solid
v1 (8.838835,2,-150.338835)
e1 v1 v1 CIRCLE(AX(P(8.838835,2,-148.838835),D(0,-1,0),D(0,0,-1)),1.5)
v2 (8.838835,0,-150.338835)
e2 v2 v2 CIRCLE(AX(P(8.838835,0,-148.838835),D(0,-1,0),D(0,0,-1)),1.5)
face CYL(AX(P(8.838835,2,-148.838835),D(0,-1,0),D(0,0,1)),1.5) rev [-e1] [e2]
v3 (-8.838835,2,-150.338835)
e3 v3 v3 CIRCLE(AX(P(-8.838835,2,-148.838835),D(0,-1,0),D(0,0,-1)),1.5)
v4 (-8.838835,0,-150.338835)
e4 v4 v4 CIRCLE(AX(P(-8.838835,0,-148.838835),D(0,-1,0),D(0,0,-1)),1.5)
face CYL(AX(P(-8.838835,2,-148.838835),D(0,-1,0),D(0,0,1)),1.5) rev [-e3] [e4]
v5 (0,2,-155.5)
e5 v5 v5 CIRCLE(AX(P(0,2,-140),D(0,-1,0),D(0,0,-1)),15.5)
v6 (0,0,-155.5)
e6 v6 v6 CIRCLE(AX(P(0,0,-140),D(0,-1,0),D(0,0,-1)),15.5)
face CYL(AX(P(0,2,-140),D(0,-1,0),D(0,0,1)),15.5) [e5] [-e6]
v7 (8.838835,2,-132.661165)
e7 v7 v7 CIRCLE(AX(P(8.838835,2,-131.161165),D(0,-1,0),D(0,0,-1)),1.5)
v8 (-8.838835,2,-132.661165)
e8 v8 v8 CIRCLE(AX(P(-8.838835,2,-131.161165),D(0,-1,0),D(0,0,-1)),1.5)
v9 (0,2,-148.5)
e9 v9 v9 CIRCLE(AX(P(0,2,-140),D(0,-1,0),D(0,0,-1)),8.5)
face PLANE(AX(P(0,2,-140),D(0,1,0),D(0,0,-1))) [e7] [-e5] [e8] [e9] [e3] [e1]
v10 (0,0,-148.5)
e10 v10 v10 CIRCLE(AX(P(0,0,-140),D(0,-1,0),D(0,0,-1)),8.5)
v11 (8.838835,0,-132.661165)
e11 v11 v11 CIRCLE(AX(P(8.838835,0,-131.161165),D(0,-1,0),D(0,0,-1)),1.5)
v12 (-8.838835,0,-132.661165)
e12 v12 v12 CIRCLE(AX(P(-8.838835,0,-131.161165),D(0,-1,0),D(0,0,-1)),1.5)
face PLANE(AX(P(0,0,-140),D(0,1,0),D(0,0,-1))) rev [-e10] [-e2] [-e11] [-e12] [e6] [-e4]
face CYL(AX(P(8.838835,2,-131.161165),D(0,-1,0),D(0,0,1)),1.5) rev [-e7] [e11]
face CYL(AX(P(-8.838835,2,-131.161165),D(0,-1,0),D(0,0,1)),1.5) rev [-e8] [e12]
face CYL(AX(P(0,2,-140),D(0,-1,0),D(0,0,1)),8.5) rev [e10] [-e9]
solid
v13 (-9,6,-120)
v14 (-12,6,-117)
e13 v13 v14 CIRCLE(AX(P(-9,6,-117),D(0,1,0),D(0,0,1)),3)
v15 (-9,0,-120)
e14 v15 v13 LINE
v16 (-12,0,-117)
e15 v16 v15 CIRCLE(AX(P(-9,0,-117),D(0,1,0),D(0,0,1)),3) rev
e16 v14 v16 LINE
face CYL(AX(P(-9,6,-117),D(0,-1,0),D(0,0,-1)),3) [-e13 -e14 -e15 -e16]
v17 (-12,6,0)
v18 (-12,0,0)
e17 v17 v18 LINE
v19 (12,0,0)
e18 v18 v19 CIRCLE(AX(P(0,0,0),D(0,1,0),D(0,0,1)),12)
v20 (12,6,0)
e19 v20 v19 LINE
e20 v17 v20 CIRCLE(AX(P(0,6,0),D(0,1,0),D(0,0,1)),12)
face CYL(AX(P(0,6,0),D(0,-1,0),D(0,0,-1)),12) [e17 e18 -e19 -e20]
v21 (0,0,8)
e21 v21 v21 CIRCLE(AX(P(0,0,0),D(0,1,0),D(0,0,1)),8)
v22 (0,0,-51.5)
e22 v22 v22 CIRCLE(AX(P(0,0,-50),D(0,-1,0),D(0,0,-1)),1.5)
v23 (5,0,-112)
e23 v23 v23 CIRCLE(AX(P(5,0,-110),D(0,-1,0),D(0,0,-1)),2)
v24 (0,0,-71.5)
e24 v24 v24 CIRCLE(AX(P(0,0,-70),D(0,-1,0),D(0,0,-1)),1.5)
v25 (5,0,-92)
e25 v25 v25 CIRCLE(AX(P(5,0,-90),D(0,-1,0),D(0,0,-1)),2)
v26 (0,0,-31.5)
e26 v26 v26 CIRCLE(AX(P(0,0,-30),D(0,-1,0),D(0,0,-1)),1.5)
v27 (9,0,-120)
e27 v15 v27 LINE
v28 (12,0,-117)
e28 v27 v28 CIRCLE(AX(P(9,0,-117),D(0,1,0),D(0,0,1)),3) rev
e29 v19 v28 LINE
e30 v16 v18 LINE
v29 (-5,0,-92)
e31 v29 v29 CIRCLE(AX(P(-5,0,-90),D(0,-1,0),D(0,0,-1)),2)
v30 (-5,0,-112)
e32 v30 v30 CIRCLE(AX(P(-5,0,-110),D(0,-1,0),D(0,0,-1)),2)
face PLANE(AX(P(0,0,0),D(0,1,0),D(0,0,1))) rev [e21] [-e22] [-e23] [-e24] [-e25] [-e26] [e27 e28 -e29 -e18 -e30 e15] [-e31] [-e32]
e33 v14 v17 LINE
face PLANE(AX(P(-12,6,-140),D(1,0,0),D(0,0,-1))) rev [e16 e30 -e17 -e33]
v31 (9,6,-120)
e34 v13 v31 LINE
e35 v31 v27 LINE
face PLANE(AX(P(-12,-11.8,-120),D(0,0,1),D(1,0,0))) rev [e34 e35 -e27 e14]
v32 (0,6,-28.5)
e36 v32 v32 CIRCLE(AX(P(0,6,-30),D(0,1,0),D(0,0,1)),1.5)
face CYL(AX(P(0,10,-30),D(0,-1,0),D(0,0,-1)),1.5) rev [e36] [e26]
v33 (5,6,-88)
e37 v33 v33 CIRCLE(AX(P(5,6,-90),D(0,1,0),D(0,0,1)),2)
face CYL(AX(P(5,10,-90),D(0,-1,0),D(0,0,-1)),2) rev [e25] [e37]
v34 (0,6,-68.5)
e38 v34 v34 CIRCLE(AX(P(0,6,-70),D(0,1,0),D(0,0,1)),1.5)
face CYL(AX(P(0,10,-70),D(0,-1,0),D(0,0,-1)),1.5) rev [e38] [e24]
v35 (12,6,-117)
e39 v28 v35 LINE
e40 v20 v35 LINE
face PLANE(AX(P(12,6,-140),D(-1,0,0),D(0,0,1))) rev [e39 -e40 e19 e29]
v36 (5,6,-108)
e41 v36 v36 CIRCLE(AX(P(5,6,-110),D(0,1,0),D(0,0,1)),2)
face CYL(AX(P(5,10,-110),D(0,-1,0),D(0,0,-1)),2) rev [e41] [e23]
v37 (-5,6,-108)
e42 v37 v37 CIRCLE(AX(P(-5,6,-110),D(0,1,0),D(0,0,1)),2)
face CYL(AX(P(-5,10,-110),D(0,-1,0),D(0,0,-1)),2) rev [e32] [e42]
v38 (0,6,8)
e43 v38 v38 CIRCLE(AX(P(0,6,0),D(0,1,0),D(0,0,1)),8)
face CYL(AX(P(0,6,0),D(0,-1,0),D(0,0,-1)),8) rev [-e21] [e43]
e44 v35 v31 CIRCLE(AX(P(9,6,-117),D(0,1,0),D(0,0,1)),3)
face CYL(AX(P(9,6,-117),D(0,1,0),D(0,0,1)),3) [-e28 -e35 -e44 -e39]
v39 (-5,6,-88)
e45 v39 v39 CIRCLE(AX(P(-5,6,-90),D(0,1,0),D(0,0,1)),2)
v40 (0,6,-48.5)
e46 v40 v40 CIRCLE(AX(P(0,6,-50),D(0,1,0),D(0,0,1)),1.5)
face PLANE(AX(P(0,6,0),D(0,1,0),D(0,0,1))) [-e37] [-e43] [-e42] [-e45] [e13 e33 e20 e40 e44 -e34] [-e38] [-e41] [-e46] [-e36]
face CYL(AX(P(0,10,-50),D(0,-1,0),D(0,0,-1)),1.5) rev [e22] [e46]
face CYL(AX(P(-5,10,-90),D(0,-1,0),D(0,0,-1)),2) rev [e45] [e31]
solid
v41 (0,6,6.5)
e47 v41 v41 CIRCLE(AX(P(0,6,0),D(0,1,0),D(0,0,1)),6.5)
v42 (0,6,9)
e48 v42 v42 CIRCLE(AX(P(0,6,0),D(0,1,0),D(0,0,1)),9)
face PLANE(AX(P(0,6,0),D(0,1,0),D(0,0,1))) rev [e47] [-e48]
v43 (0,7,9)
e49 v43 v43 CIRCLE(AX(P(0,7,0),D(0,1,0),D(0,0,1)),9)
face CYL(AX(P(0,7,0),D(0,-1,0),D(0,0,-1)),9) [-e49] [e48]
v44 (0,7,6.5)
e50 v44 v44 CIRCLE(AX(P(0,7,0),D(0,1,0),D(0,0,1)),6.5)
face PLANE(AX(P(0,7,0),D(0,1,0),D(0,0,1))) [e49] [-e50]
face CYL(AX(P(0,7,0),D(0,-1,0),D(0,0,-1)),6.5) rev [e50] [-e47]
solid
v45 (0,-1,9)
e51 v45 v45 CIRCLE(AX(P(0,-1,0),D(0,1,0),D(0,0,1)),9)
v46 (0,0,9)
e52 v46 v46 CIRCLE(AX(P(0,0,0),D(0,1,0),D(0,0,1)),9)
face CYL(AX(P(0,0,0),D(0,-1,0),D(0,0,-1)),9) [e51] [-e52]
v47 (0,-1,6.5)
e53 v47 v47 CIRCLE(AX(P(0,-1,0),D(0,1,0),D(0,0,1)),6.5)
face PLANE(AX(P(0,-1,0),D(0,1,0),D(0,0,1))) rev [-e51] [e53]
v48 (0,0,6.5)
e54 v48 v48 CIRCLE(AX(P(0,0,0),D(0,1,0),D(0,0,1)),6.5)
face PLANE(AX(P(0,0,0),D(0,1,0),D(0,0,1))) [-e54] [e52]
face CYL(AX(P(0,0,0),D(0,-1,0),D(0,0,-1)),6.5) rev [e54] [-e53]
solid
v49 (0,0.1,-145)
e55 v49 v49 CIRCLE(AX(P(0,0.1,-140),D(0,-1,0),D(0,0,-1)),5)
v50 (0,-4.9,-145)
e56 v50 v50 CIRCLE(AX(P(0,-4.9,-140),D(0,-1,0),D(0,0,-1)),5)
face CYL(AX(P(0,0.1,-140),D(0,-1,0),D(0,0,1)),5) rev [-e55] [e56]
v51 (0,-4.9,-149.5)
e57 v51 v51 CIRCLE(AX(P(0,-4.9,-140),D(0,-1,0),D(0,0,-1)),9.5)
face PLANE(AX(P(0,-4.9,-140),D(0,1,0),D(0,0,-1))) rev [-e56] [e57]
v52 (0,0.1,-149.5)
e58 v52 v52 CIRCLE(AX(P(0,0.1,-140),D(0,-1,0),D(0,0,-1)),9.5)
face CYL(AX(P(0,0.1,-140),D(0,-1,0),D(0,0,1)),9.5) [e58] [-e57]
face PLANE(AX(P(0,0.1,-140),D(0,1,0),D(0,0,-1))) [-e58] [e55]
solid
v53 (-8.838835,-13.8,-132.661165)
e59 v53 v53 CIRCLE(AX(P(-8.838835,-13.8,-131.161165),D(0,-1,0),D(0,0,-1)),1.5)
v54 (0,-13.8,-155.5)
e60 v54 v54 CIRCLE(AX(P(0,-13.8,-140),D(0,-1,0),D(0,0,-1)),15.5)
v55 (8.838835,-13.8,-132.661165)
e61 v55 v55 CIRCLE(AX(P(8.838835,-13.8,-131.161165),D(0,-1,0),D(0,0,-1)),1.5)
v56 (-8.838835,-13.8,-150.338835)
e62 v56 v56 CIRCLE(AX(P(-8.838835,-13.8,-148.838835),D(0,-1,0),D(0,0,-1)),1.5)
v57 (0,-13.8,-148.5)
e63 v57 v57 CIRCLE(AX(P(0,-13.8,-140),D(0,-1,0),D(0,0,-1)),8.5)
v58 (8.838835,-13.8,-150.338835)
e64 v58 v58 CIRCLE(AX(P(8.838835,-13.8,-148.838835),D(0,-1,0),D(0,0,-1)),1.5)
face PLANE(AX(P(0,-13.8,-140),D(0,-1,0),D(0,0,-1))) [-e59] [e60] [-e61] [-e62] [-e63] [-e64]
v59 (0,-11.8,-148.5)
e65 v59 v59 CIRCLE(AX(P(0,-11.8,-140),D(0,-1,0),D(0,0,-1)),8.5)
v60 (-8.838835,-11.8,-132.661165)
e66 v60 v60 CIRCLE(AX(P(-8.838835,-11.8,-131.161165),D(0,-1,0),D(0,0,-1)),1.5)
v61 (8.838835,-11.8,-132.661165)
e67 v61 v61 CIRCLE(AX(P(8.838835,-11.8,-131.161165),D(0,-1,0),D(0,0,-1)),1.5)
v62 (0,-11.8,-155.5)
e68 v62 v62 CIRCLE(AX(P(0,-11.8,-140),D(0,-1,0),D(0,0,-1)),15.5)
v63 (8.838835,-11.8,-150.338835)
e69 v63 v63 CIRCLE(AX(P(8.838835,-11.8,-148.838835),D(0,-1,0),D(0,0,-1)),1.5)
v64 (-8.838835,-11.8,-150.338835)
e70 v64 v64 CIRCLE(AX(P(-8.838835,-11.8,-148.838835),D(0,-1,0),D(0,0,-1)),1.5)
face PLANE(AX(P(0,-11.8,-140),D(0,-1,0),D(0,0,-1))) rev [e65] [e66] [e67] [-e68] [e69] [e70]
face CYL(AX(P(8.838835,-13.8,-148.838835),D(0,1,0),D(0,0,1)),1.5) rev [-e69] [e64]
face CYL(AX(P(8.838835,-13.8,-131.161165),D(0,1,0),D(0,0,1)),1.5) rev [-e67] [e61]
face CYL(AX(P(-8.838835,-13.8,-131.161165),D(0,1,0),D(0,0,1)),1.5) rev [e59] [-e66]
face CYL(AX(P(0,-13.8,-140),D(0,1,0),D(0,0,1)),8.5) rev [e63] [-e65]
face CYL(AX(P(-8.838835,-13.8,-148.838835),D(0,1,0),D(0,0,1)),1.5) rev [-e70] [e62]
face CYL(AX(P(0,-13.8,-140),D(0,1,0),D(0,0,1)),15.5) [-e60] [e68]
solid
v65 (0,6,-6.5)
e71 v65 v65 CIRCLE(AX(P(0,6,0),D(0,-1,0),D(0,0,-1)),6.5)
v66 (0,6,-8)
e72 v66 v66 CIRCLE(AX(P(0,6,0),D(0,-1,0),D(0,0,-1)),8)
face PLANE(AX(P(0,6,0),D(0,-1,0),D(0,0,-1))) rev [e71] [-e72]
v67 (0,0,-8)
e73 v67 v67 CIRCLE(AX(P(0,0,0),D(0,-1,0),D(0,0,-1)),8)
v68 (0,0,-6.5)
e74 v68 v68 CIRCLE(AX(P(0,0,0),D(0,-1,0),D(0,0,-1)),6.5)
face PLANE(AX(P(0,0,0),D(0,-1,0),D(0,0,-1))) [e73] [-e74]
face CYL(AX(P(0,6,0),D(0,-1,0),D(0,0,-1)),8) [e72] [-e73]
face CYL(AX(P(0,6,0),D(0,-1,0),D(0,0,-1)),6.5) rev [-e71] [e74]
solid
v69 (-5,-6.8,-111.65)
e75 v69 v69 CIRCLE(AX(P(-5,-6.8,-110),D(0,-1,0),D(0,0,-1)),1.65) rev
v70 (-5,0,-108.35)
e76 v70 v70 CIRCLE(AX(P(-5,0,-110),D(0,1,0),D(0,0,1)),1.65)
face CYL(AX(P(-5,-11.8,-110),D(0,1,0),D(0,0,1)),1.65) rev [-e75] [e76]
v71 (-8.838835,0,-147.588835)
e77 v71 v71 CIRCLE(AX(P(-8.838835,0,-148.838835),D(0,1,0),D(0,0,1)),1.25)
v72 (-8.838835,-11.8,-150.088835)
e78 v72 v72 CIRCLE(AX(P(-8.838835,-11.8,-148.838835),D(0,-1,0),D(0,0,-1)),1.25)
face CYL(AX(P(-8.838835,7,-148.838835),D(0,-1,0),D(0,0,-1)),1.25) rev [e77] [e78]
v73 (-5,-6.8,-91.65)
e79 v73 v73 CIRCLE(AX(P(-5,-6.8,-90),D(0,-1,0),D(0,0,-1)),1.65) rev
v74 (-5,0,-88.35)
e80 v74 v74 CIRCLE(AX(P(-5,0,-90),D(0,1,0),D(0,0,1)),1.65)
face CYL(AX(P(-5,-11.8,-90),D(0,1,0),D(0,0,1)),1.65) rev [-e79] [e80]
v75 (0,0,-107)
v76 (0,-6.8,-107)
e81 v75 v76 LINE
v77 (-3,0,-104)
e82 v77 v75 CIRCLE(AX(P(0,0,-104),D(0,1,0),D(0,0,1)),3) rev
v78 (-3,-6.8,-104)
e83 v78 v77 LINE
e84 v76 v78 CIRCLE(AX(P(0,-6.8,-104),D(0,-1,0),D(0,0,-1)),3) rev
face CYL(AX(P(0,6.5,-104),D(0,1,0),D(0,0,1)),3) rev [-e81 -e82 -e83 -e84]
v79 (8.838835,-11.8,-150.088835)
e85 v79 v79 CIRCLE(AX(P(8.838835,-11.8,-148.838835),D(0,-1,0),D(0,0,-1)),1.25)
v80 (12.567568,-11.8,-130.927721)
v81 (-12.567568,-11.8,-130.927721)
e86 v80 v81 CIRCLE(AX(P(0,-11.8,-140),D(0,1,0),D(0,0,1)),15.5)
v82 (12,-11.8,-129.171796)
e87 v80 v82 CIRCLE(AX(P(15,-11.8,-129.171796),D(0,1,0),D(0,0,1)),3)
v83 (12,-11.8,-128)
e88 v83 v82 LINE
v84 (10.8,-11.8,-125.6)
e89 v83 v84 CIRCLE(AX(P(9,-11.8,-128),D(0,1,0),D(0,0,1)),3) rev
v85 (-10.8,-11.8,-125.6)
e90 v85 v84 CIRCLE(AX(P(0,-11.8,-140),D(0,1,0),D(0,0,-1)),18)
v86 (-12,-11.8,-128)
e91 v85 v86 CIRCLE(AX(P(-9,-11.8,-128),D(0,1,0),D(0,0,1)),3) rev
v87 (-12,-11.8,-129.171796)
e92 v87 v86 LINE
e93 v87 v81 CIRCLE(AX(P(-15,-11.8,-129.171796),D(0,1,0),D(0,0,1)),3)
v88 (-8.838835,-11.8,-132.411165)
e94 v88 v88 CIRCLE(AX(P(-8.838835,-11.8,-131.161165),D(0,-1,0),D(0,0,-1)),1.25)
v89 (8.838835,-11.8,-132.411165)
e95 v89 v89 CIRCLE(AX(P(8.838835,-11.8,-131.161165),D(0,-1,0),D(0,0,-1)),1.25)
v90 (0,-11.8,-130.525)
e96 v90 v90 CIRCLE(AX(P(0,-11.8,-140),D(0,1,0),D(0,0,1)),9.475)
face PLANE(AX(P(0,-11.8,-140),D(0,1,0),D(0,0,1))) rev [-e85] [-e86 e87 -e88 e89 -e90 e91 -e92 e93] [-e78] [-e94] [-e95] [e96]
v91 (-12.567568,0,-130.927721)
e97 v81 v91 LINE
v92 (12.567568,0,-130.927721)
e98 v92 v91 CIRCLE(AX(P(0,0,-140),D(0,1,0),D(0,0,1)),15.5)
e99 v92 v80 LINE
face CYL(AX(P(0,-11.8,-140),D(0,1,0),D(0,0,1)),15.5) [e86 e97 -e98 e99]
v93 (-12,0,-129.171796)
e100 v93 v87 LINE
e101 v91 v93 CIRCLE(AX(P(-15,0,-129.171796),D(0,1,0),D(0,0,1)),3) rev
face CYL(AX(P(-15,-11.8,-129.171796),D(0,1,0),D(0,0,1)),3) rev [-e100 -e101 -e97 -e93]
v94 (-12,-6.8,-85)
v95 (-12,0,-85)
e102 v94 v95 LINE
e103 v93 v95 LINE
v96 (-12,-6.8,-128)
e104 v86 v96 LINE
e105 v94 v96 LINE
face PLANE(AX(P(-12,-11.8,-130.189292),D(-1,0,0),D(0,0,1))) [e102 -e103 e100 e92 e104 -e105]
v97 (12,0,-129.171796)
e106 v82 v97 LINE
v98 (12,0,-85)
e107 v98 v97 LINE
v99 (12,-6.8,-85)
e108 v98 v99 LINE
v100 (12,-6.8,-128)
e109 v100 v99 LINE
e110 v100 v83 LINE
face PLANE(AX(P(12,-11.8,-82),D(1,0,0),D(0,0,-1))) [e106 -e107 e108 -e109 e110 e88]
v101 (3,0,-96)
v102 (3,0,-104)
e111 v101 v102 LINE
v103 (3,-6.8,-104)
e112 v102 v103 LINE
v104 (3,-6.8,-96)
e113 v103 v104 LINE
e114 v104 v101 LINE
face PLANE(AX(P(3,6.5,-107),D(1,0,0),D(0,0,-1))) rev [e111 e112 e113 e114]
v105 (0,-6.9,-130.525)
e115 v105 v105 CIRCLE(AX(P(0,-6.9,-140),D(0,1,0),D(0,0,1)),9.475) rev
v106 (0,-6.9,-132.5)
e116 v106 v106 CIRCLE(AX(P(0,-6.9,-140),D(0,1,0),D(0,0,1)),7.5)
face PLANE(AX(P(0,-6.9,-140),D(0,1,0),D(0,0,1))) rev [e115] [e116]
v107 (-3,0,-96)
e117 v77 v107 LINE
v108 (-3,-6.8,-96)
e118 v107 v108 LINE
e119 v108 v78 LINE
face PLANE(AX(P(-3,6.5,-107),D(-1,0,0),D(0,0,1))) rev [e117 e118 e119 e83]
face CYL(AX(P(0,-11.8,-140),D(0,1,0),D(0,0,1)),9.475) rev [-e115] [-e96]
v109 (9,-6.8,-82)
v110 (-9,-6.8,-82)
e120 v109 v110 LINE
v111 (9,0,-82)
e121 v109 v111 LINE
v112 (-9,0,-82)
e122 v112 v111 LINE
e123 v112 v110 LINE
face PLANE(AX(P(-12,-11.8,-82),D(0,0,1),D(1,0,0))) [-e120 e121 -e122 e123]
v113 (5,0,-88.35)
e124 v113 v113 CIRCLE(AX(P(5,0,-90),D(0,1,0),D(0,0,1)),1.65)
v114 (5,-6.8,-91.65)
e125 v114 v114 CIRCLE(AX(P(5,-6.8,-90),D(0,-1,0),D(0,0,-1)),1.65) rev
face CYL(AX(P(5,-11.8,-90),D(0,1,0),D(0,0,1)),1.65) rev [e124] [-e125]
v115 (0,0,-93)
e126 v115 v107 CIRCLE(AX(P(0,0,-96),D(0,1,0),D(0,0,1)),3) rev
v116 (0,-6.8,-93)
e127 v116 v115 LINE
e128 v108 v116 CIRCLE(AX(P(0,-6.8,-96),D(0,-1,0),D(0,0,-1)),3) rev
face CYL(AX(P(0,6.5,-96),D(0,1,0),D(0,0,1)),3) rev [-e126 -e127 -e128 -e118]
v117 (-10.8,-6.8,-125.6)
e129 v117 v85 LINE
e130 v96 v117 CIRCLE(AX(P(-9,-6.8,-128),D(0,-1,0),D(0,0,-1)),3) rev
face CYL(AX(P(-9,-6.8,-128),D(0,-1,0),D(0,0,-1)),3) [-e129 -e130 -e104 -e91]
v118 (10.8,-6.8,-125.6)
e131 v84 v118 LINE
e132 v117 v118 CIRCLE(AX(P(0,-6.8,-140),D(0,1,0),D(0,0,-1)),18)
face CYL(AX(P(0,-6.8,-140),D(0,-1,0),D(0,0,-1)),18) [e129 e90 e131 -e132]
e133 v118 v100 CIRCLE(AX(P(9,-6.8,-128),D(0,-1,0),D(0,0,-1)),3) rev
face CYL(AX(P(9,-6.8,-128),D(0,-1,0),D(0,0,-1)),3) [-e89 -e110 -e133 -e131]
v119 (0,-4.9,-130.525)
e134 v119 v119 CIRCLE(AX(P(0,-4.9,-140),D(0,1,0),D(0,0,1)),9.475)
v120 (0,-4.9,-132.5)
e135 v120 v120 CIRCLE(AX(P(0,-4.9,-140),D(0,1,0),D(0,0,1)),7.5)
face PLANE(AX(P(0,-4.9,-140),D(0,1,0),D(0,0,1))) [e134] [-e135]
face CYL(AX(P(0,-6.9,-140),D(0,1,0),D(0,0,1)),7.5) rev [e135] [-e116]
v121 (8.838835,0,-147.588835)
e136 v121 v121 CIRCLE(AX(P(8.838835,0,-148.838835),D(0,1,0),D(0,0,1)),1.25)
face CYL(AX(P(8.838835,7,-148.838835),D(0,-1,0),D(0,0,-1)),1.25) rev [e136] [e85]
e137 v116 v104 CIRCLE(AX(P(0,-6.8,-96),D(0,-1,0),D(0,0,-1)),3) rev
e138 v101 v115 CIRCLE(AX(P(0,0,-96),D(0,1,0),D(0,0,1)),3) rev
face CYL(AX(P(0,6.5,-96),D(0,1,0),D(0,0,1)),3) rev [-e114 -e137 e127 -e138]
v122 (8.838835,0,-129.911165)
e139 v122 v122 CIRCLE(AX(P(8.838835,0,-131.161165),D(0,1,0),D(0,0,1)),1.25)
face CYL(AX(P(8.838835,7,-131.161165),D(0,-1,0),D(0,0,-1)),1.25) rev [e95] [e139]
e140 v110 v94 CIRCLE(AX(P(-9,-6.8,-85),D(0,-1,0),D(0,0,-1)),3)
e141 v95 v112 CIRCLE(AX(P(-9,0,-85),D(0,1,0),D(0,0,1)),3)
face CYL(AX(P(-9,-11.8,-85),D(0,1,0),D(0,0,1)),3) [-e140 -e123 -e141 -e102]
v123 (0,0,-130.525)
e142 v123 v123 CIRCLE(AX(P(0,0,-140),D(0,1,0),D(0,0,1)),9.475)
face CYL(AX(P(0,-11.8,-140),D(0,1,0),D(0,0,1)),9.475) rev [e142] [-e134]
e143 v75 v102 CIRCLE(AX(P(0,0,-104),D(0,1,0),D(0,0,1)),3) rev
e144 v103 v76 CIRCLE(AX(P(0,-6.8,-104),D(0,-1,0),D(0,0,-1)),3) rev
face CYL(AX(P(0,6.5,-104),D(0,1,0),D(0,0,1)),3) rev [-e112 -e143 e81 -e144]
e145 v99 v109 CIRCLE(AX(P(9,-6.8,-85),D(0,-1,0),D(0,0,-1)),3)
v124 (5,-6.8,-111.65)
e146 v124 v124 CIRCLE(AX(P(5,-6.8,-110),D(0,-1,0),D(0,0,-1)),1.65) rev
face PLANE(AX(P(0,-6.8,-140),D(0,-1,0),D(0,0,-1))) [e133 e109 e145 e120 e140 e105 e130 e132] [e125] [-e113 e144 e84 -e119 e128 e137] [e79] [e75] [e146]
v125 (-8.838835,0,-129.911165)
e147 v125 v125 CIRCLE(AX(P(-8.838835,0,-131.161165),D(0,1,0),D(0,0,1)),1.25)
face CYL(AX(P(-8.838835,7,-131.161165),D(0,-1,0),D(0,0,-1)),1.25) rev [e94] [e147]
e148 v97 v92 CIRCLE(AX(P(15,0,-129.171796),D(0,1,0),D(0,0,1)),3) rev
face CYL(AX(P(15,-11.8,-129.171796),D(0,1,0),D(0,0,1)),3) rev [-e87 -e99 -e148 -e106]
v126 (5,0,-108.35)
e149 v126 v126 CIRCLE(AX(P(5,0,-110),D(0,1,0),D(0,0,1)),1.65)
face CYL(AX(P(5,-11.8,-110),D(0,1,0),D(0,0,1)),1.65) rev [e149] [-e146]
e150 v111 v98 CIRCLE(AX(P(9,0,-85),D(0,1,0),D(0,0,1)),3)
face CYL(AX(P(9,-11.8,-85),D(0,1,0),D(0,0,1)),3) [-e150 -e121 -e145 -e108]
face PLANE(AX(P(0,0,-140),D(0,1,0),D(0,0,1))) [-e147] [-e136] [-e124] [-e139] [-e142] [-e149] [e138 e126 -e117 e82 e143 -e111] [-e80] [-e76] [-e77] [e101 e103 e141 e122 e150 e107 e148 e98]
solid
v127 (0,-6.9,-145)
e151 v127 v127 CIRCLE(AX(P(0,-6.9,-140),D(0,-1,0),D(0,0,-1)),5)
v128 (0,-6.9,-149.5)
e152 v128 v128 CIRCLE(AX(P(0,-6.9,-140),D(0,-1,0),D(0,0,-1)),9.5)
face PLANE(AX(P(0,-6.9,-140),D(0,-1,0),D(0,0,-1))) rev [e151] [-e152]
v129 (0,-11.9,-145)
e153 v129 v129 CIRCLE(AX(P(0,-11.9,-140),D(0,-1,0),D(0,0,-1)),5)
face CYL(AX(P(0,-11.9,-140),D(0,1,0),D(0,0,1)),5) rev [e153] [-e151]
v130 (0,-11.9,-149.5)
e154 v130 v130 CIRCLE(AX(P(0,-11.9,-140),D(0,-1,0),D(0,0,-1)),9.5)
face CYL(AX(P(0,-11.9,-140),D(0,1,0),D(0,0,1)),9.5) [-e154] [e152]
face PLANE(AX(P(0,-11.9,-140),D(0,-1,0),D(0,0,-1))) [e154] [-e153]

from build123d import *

# Parameters (mm, degrees)
SKETCH_1_R             = 8
EXTRUDE_1_DEPTH        = 6
SKETCH_2_R             = 8
SKETCH_2_R_2           = 5
EXTRUDE_2_DEPTH        = 6
EXTRUDE_2_2_DEPTH      = 6
SKETCH_3_R             = 8
SKETCH_3_R_2           = 5
EXTRUDE_3_DEPTH        = 0.5
EXTRUDE_3_2_DEPTH      = 0.5
PATTERN_LINEAR_1_COUNT = 2
PATTERN_LINEAR_1_PITCH = 6.5
SKETCH_4_R             = 2
SKETCH_4_R_2           = 1.5
CUT_EXTRUDE_1_DEPTH    = 10
SKETCH_5_R             = 9.475
SKETCH_5_R_2           = 1.65
EXTRUDE_4_DEPTH        = 11.8
CUT_EXTRUDE_4_DEPTH    = 158.281085958
CUT_EXTRUDE_2_DEPTH    = 5
SKETCH_8_W             = 6
SKETCH_8_H             = 14
CUT_EXTRUDE_3_DEPTH    = 158.338456837
FILLET_2_R             = 3
SKETCH_11_R            = 8
SKETCH_11_R_2          = 6.5
EXTRUDE_5_DEPTH        = 6
SKETCH_14_R            = 9
SKETCH_14_R_2          = 6.5
EXTRUDE_7_DEPTH        = 1
PATTERN_LINEAR_2_COUNT = 2
PATTERN_LINEAR_2_PITCH = 7
FILLET_1_R             = 3
EXTRUDE_START          = -4.9
SKETCH_16_R            = 9.475
SKETCH_16_R_2          = 7.5
EXTRUDE_8_DEPTH        = 2
SKETCH_17_R            = 9.5
SKETCH_17_R_2          = 5
EXTRUDE_9_DEPTH        = 5
SKETCH_18_R            = 15.5
SKETCH_18_R_2          = 1.5
SKETCH_18_R_3          = 8.5
EXTRUDE_10_DEPTH       = 2
SKETCH_20_R            = 1.25
CUT_EXTRUDE_5_DEPTH    = 158.39739515


with BuildPart() as part:
    # 草图1 → 凸台-拉伸1 (new body)
    with BuildSketch(Plane(origin=(0, 0, 0), x_dir=(1, 0, 0), z_dir=(0, 1, 0))):
        with BuildLine():
            Line((-12, 140), (-12, 0))
            ThreePointArc((-12, 0), (0, -12), (12, 0))
            Line((12, 0), (12, 140))
            ThreePointArc((12, 140), (0, 152), (-12, 140))
        make_face()
        with Locations(Location((0, 0, 0), (0, 0, 270))):
            Circle(SKETCH_1_R, mode=Mode.SUBTRACT)
        with Locations(Location((0, 140, 0), (0, 0, 270))):
            Circle(SKETCH_1_R, mode=Mode.SUBTRACT)
    extrude(amount=EXTRUDE_1_DEPTH)

    # 草图4 → 切除-拉伸1 (cut)
    with BuildSketch(Plane.XZ):
        with Locations(Location((5, -90, 0), (0, 0, 270))):
            Circle(SKETCH_4_R)
        with Locations(Location((-5, -90, 0), (0, 0, 270))):
            Circle(SKETCH_4_R)
        with Locations(Location((-5, -110, 0), (0, 0, 270))):
            Circle(SKETCH_4_R)
        with Locations(Location((5, -110, 0), (0, 0, 270))):
            Circle(SKETCH_4_R)
        with Locations(Location((0, -70, 0), (0, 0, 270))):
            Circle(SKETCH_4_R_2)
        with Locations(Location((0, -50, 0), (0, 0, 270))):
            Circle(SKETCH_4_R_2)
        with Locations(Location((0, -30, 0), (0, 0, 270))):
            Circle(SKETCH_4_R_2)
    extrude(amount=-CUT_EXTRUDE_1_DEPTH, mode=Mode.SUBTRACT)

    # 草图9 → 切除-拉伸4 (cut, through all)
    with BuildSketch(Plane(origin=(0, 6, 0), x_dir=(1, 0, 0), z_dir=(0, 1, 0))):
        with BuildLine():
            Line((-12, 120), (12, 120))
            Line((12, 120), (12, 140))
            ThreePointArc((12, 140), (0, 152), (-12, 140))
            Line((-12, 140), (-12, 120))
        make_face()
    extrude(amount=-CUT_EXTRUDE_4_DEPTH, mode=Mode.SUBTRACT)

    # 圆角2
    fillet_2_edges = [part.edges().sort_by_distance(p)[0] for p in [
        (-12, 3, -120),
        (12, 3, -120),
    ]]
    fillet(fillet_2_edges, radius=FILLET_2_R)


with BuildPart() as body_2:
    # 草图2 → 凸台-拉伸2 (new body)
    with BuildSketch(Plane(origin=(0, 6, 0), x_dir=(1, 0, 0), z_dir=(0, 1, 0))):
        with Locations(Location((0, 0, 0), (0, 0, 270))):
            Circle(SKETCH_2_R)
        with Locations(Location((0, 0, 0), (0, 0, 270))):
            Circle(SKETCH_2_R_2, mode=Mode.SUBTRACT)
    extrude(amount=-EXTRUDE_2_DEPTH)


with BuildPart() as body_3:
    # 草图2 → Extrude 2 2 (new body)
    with BuildSketch(Plane(origin=(0, 6, 0), x_dir=(1, 0, 0), z_dir=(0, 1, 0))):
        with Locations(Location((0, 140, 0), (0, 0, 270))):
            Circle(SKETCH_2_R)
        with Locations(Location((0, 140, 0), (0, 0, 270))):
            Circle(SKETCH_2_R_2, mode=Mode.SUBTRACT)
    extrude(amount=-EXTRUDE_2_2_DEPTH)


with BuildPart() as body_4:
    # 草图3 → 凸台-拉伸3 (new body)
    with BuildSketch(Plane.XZ):
        with Locations(Location((0, 0, 0), (0, 0, 90))):
            Circle(SKETCH_3_R)
        with Locations(Location((0, 0, 0), (0, 0, 270))):
            Circle(SKETCH_3_R_2, mode=Mode.SUBTRACT)
    extrude(amount=EXTRUDE_3_DEPTH)


with BuildPart() as body_5:
    # 草图3 → Extrude 3 2 (new body)
    with BuildSketch(Plane.XZ):
        with Locations(Location((0, -140, 0), (0, 0, 90))):
            Circle(SKETCH_3_R)
        with Locations(Location((0, -140, 0), (0, 0, 90))):
            Circle(SKETCH_3_R_2, mode=Mode.SUBTRACT)
    extrude(amount=EXTRUDE_3_2_DEPTH)


with BuildPart() as pattern_linear_1_1:
    # 阵列(线性)1: pattern copy
    add(body_4.part.moved(Location(Vector(0, 1, 0) * (1 * PATTERN_LINEAR_1_PITCH))))


with BuildPart() as pattern_linear_1_2:
    # 阵列(线性)1: pattern copy
    add(body_5.part.moved(Location(Vector(0, 1, 0) * (1 * PATTERN_LINEAR_1_PITCH))))


with BuildPart() as body_8:
    # 草图5 → 凸台-拉伸4 (new body)
    with BuildSketch(Plane(origin=(0, 0, 0), x_dir=(1, 0, 0), z_dir=(0, 1, 0))):
        with BuildLine():
            Line((-12, 82), (12, 82))
            Line((12, 82), (12, 130.189291565))
            ThreePointArc((12, 130.189291565), (0, 155.5), (-12, 130.189291565))
            Line((-12, 130.189291565), (-12, 82))
        make_face()
        with Locations(Location((0, 140, 0), (0, 0, 270))):
            Circle(SKETCH_5_R, mode=Mode.SUBTRACT)
        with Locations(Location((-5, 110, 0), (0, 0, 270))):
            Circle(SKETCH_5_R_2, mode=Mode.SUBTRACT)
        with Locations(Location((-5, 90, 0), (0, 0, 270))):
            Circle(SKETCH_5_R_2, mode=Mode.SUBTRACT)
        with Locations(Location((5, 90, 0), (0, 0, 270))):
            Circle(SKETCH_5_R_2, mode=Mode.SUBTRACT)
        with Locations(Location((5, 110, 0), (0, 0, 270))):
            Circle(SKETCH_5_R_2, mode=Mode.SUBTRACT)
    extrude(amount=-EXTRUDE_4_DEPTH)

    # 草图6 → 切除-拉伸2 (cut)
    with BuildSketch(Plane.XZ.offset(11.8)):
        with BuildLine():
            Line((-12, -82), (-12, -126.583592135))
            ThreePointArc((-12, -126.583592135), (0, -122), (12, -126.583592135))
            Line((12, -126.583592135), (12, -82))
            Line((12, -82), (-12, -82))
        make_face()
    extrude(amount=-CUT_EXTRUDE_2_DEPTH, mode=Mode.SUBTRACT)

    # 草图8 → 切除-拉伸3 (cut, through all)
    with BuildSketch(Plane.XZ.offset(11.8)):
        with Locations((0, -100)):
            Rectangle(SKETCH_8_W, SKETCH_8_H)
    extrude(amount=-CUT_EXTRUDE_3_DEPTH, mode=Mode.SUBTRACT)

    # 圆角1
    fillet_1_edges = [body_8.edges().sort_by_distance(p)[0] for p in [
        (12, -9.3, -126.583592135),
        (-12, -9.3, -126.583592135),
        (-12, -3.4, -82),
        (12, -3.4, -82),
        (3, -3.4, -93),
        (3, -3.4, -107),
        (-3, -3.4, -107),
        (-3, -3.4, -93),
        (12, -5.9, -130.189291565),
        (-12, -5.9, -130.189291565),
    ]]
    fillet(fillet_1_edges, radius=FILLET_1_R - 0.0001)  # a hair under: the kernel refuses the full size

    # 草图16 → 凸台-拉伸8 (add)
    with BuildSketch(Plane(origin=(0, 0, 0), x_dir=(1, 0, 0), z_dir=(0, 1, 0)).offset(EXTRUDE_START)):
        with Locations(Location((0, 140, 0), (0, 0, 270))):
            Circle(SKETCH_16_R)
        with Locations(Location((0, 140, 0), (0, 0, 270))):
            Circle(SKETCH_16_R_2, mode=Mode.SUBTRACT)
    extrude(amount=-EXTRUDE_8_DEPTH)

    # 草图20 → 切除-拉伸5 (cut, through all)
    with BuildSketch(Plane.XZ.offset(11.8)):
        with Locations(Location((-8.838834765, -131.161165235, 0), (0, 0, 270))):
            Circle(SKETCH_20_R)
        with Locations(Location((8.838834765, -131.161165235, 0), (0, 0, 270))):
            Circle(SKETCH_20_R)
        with Locations(Location((-8.838834765, -148.838834765, 0), (0, 0, 270))):
            Circle(SKETCH_20_R)
        with Locations(Location((8.838834765, -148.838834765, 0), (0, 0, 270))):
            Circle(SKETCH_20_R)
    extrude(amount=-CUT_EXTRUDE_5_DEPTH, mode=Mode.SUBTRACT)


with BuildPart() as body_5_1:
    # Move Body 2: read off the stored shape, not the designer's step
    # Move Body 2: moved
    add(body_5.part.moved(Location((0, -11.8, 0))))


with BuildPart() as pattern_linear_1_2_1:
    # Move Body 3: read off the stored shape, not the designer's step
    # Move Body 3: moved
    add(pattern_linear_1_2.part.moved(Location((0, -6, 0))))


with BuildPart() as body_3_2:
    # 草图11 → 凸台-拉伸5 (new body)
    with BuildSketch(Plane.XZ):
        with Locations(Location((0, 0, 0), (0, 0, 270))):
            Circle(SKETCH_11_R)
        with Locations(Location((0, 0, 0), (0, 0, 270))):
            Circle(SKETCH_11_R_2, mode=Mode.SUBTRACT)
    extrude(amount=-EXTRUDE_5_DEPTH)


with BuildPart() as body_4_2:
    # 草图14 → 凸台-拉伸7 (new body)
    with BuildSketch(Plane(origin=(0, 6, 0), x_dir=(1, 0, 0), z_dir=(0, 1, 0))):
        with Locations(Location((0, 0, 0), (0, 0, 270))):
            Circle(SKETCH_14_R)
        with Locations(Location((0, 0, 0), (0, 0, 270))):
            Circle(SKETCH_14_R_2, mode=Mode.SUBTRACT)
    extrude(amount=EXTRUDE_7_DEPTH)


with BuildPart() as pattern_linear_2_1:
    # 阵列(线性)2: pattern copy
    add(body_4_2.part.moved(Location(Vector(0, -1, 0) * (1 * PATTERN_LINEAR_2_PITCH))))


with BuildPart() as body_6:
    # 草图17 → 凸台-拉伸9 (new body)
    with BuildSketch(Plane.XZ.offset(6.9)):
        with Locations(Location((0, -140, 0), (0, 0, 270))):
            Circle(SKETCH_17_R)
        with Locations(Location((0, -140, 0), (0, 0, 270))):
            Circle(SKETCH_17_R_2, mode=Mode.SUBTRACT)
    extrude(amount=EXTRUDE_9_DEPTH)


with BuildPart() as body_7:
    # 草图18 → 凸台-拉伸10 (new body)
    with BuildSketch(Plane.XZ.offset(11.8)):
        with Locations(Location((0, -140, 0), (0, 0, 270))):
            Circle(SKETCH_18_R)
        with Locations(Location((-8.838834765, -131.161165235, 0), (0, 0, 270))):
            Circle(SKETCH_18_R_2, mode=Mode.SUBTRACT)
        with Locations(Location((8.838834765, -131.161165235, 0), (0, 0, 270))):
            Circle(SKETCH_18_R_2, mode=Mode.SUBTRACT)
        with Locations(Location((8.838834765, -148.838834765, 0), (0, 0, 270))):
            Circle(SKETCH_18_R_2, mode=Mode.SUBTRACT)
        with Locations(Location((-8.838834765, -148.838834765, 0), (0, 0, 270))):
            Circle(SKETCH_18_R_2, mode=Mode.SUBTRACT)
        with Locations(Location((0, -140, 0), (0, 0, 270))):
            Circle(SKETCH_18_R_3, mode=Mode.SUBTRACT)
    extrude(amount=EXTRUDE_10_DEPTH)


with BuildPart() as body_8_2:
    # 镜向1: mirrored copy
    add(body_7.part.mirror(Plane.ZX.offset(-5.9)))


with BuildPart() as body_9:
    # Mirror 1 2: mirrored copy
    add(body_6.part.mirror(Plane.ZX.offset(-5.9)))


solid = Compound([part.part, body_8.part, body_3_2.part, body_4_2.part, pattern_linear_2_1.part, body_6.part, body_7.part, body_8_2.part, body_9.part])
